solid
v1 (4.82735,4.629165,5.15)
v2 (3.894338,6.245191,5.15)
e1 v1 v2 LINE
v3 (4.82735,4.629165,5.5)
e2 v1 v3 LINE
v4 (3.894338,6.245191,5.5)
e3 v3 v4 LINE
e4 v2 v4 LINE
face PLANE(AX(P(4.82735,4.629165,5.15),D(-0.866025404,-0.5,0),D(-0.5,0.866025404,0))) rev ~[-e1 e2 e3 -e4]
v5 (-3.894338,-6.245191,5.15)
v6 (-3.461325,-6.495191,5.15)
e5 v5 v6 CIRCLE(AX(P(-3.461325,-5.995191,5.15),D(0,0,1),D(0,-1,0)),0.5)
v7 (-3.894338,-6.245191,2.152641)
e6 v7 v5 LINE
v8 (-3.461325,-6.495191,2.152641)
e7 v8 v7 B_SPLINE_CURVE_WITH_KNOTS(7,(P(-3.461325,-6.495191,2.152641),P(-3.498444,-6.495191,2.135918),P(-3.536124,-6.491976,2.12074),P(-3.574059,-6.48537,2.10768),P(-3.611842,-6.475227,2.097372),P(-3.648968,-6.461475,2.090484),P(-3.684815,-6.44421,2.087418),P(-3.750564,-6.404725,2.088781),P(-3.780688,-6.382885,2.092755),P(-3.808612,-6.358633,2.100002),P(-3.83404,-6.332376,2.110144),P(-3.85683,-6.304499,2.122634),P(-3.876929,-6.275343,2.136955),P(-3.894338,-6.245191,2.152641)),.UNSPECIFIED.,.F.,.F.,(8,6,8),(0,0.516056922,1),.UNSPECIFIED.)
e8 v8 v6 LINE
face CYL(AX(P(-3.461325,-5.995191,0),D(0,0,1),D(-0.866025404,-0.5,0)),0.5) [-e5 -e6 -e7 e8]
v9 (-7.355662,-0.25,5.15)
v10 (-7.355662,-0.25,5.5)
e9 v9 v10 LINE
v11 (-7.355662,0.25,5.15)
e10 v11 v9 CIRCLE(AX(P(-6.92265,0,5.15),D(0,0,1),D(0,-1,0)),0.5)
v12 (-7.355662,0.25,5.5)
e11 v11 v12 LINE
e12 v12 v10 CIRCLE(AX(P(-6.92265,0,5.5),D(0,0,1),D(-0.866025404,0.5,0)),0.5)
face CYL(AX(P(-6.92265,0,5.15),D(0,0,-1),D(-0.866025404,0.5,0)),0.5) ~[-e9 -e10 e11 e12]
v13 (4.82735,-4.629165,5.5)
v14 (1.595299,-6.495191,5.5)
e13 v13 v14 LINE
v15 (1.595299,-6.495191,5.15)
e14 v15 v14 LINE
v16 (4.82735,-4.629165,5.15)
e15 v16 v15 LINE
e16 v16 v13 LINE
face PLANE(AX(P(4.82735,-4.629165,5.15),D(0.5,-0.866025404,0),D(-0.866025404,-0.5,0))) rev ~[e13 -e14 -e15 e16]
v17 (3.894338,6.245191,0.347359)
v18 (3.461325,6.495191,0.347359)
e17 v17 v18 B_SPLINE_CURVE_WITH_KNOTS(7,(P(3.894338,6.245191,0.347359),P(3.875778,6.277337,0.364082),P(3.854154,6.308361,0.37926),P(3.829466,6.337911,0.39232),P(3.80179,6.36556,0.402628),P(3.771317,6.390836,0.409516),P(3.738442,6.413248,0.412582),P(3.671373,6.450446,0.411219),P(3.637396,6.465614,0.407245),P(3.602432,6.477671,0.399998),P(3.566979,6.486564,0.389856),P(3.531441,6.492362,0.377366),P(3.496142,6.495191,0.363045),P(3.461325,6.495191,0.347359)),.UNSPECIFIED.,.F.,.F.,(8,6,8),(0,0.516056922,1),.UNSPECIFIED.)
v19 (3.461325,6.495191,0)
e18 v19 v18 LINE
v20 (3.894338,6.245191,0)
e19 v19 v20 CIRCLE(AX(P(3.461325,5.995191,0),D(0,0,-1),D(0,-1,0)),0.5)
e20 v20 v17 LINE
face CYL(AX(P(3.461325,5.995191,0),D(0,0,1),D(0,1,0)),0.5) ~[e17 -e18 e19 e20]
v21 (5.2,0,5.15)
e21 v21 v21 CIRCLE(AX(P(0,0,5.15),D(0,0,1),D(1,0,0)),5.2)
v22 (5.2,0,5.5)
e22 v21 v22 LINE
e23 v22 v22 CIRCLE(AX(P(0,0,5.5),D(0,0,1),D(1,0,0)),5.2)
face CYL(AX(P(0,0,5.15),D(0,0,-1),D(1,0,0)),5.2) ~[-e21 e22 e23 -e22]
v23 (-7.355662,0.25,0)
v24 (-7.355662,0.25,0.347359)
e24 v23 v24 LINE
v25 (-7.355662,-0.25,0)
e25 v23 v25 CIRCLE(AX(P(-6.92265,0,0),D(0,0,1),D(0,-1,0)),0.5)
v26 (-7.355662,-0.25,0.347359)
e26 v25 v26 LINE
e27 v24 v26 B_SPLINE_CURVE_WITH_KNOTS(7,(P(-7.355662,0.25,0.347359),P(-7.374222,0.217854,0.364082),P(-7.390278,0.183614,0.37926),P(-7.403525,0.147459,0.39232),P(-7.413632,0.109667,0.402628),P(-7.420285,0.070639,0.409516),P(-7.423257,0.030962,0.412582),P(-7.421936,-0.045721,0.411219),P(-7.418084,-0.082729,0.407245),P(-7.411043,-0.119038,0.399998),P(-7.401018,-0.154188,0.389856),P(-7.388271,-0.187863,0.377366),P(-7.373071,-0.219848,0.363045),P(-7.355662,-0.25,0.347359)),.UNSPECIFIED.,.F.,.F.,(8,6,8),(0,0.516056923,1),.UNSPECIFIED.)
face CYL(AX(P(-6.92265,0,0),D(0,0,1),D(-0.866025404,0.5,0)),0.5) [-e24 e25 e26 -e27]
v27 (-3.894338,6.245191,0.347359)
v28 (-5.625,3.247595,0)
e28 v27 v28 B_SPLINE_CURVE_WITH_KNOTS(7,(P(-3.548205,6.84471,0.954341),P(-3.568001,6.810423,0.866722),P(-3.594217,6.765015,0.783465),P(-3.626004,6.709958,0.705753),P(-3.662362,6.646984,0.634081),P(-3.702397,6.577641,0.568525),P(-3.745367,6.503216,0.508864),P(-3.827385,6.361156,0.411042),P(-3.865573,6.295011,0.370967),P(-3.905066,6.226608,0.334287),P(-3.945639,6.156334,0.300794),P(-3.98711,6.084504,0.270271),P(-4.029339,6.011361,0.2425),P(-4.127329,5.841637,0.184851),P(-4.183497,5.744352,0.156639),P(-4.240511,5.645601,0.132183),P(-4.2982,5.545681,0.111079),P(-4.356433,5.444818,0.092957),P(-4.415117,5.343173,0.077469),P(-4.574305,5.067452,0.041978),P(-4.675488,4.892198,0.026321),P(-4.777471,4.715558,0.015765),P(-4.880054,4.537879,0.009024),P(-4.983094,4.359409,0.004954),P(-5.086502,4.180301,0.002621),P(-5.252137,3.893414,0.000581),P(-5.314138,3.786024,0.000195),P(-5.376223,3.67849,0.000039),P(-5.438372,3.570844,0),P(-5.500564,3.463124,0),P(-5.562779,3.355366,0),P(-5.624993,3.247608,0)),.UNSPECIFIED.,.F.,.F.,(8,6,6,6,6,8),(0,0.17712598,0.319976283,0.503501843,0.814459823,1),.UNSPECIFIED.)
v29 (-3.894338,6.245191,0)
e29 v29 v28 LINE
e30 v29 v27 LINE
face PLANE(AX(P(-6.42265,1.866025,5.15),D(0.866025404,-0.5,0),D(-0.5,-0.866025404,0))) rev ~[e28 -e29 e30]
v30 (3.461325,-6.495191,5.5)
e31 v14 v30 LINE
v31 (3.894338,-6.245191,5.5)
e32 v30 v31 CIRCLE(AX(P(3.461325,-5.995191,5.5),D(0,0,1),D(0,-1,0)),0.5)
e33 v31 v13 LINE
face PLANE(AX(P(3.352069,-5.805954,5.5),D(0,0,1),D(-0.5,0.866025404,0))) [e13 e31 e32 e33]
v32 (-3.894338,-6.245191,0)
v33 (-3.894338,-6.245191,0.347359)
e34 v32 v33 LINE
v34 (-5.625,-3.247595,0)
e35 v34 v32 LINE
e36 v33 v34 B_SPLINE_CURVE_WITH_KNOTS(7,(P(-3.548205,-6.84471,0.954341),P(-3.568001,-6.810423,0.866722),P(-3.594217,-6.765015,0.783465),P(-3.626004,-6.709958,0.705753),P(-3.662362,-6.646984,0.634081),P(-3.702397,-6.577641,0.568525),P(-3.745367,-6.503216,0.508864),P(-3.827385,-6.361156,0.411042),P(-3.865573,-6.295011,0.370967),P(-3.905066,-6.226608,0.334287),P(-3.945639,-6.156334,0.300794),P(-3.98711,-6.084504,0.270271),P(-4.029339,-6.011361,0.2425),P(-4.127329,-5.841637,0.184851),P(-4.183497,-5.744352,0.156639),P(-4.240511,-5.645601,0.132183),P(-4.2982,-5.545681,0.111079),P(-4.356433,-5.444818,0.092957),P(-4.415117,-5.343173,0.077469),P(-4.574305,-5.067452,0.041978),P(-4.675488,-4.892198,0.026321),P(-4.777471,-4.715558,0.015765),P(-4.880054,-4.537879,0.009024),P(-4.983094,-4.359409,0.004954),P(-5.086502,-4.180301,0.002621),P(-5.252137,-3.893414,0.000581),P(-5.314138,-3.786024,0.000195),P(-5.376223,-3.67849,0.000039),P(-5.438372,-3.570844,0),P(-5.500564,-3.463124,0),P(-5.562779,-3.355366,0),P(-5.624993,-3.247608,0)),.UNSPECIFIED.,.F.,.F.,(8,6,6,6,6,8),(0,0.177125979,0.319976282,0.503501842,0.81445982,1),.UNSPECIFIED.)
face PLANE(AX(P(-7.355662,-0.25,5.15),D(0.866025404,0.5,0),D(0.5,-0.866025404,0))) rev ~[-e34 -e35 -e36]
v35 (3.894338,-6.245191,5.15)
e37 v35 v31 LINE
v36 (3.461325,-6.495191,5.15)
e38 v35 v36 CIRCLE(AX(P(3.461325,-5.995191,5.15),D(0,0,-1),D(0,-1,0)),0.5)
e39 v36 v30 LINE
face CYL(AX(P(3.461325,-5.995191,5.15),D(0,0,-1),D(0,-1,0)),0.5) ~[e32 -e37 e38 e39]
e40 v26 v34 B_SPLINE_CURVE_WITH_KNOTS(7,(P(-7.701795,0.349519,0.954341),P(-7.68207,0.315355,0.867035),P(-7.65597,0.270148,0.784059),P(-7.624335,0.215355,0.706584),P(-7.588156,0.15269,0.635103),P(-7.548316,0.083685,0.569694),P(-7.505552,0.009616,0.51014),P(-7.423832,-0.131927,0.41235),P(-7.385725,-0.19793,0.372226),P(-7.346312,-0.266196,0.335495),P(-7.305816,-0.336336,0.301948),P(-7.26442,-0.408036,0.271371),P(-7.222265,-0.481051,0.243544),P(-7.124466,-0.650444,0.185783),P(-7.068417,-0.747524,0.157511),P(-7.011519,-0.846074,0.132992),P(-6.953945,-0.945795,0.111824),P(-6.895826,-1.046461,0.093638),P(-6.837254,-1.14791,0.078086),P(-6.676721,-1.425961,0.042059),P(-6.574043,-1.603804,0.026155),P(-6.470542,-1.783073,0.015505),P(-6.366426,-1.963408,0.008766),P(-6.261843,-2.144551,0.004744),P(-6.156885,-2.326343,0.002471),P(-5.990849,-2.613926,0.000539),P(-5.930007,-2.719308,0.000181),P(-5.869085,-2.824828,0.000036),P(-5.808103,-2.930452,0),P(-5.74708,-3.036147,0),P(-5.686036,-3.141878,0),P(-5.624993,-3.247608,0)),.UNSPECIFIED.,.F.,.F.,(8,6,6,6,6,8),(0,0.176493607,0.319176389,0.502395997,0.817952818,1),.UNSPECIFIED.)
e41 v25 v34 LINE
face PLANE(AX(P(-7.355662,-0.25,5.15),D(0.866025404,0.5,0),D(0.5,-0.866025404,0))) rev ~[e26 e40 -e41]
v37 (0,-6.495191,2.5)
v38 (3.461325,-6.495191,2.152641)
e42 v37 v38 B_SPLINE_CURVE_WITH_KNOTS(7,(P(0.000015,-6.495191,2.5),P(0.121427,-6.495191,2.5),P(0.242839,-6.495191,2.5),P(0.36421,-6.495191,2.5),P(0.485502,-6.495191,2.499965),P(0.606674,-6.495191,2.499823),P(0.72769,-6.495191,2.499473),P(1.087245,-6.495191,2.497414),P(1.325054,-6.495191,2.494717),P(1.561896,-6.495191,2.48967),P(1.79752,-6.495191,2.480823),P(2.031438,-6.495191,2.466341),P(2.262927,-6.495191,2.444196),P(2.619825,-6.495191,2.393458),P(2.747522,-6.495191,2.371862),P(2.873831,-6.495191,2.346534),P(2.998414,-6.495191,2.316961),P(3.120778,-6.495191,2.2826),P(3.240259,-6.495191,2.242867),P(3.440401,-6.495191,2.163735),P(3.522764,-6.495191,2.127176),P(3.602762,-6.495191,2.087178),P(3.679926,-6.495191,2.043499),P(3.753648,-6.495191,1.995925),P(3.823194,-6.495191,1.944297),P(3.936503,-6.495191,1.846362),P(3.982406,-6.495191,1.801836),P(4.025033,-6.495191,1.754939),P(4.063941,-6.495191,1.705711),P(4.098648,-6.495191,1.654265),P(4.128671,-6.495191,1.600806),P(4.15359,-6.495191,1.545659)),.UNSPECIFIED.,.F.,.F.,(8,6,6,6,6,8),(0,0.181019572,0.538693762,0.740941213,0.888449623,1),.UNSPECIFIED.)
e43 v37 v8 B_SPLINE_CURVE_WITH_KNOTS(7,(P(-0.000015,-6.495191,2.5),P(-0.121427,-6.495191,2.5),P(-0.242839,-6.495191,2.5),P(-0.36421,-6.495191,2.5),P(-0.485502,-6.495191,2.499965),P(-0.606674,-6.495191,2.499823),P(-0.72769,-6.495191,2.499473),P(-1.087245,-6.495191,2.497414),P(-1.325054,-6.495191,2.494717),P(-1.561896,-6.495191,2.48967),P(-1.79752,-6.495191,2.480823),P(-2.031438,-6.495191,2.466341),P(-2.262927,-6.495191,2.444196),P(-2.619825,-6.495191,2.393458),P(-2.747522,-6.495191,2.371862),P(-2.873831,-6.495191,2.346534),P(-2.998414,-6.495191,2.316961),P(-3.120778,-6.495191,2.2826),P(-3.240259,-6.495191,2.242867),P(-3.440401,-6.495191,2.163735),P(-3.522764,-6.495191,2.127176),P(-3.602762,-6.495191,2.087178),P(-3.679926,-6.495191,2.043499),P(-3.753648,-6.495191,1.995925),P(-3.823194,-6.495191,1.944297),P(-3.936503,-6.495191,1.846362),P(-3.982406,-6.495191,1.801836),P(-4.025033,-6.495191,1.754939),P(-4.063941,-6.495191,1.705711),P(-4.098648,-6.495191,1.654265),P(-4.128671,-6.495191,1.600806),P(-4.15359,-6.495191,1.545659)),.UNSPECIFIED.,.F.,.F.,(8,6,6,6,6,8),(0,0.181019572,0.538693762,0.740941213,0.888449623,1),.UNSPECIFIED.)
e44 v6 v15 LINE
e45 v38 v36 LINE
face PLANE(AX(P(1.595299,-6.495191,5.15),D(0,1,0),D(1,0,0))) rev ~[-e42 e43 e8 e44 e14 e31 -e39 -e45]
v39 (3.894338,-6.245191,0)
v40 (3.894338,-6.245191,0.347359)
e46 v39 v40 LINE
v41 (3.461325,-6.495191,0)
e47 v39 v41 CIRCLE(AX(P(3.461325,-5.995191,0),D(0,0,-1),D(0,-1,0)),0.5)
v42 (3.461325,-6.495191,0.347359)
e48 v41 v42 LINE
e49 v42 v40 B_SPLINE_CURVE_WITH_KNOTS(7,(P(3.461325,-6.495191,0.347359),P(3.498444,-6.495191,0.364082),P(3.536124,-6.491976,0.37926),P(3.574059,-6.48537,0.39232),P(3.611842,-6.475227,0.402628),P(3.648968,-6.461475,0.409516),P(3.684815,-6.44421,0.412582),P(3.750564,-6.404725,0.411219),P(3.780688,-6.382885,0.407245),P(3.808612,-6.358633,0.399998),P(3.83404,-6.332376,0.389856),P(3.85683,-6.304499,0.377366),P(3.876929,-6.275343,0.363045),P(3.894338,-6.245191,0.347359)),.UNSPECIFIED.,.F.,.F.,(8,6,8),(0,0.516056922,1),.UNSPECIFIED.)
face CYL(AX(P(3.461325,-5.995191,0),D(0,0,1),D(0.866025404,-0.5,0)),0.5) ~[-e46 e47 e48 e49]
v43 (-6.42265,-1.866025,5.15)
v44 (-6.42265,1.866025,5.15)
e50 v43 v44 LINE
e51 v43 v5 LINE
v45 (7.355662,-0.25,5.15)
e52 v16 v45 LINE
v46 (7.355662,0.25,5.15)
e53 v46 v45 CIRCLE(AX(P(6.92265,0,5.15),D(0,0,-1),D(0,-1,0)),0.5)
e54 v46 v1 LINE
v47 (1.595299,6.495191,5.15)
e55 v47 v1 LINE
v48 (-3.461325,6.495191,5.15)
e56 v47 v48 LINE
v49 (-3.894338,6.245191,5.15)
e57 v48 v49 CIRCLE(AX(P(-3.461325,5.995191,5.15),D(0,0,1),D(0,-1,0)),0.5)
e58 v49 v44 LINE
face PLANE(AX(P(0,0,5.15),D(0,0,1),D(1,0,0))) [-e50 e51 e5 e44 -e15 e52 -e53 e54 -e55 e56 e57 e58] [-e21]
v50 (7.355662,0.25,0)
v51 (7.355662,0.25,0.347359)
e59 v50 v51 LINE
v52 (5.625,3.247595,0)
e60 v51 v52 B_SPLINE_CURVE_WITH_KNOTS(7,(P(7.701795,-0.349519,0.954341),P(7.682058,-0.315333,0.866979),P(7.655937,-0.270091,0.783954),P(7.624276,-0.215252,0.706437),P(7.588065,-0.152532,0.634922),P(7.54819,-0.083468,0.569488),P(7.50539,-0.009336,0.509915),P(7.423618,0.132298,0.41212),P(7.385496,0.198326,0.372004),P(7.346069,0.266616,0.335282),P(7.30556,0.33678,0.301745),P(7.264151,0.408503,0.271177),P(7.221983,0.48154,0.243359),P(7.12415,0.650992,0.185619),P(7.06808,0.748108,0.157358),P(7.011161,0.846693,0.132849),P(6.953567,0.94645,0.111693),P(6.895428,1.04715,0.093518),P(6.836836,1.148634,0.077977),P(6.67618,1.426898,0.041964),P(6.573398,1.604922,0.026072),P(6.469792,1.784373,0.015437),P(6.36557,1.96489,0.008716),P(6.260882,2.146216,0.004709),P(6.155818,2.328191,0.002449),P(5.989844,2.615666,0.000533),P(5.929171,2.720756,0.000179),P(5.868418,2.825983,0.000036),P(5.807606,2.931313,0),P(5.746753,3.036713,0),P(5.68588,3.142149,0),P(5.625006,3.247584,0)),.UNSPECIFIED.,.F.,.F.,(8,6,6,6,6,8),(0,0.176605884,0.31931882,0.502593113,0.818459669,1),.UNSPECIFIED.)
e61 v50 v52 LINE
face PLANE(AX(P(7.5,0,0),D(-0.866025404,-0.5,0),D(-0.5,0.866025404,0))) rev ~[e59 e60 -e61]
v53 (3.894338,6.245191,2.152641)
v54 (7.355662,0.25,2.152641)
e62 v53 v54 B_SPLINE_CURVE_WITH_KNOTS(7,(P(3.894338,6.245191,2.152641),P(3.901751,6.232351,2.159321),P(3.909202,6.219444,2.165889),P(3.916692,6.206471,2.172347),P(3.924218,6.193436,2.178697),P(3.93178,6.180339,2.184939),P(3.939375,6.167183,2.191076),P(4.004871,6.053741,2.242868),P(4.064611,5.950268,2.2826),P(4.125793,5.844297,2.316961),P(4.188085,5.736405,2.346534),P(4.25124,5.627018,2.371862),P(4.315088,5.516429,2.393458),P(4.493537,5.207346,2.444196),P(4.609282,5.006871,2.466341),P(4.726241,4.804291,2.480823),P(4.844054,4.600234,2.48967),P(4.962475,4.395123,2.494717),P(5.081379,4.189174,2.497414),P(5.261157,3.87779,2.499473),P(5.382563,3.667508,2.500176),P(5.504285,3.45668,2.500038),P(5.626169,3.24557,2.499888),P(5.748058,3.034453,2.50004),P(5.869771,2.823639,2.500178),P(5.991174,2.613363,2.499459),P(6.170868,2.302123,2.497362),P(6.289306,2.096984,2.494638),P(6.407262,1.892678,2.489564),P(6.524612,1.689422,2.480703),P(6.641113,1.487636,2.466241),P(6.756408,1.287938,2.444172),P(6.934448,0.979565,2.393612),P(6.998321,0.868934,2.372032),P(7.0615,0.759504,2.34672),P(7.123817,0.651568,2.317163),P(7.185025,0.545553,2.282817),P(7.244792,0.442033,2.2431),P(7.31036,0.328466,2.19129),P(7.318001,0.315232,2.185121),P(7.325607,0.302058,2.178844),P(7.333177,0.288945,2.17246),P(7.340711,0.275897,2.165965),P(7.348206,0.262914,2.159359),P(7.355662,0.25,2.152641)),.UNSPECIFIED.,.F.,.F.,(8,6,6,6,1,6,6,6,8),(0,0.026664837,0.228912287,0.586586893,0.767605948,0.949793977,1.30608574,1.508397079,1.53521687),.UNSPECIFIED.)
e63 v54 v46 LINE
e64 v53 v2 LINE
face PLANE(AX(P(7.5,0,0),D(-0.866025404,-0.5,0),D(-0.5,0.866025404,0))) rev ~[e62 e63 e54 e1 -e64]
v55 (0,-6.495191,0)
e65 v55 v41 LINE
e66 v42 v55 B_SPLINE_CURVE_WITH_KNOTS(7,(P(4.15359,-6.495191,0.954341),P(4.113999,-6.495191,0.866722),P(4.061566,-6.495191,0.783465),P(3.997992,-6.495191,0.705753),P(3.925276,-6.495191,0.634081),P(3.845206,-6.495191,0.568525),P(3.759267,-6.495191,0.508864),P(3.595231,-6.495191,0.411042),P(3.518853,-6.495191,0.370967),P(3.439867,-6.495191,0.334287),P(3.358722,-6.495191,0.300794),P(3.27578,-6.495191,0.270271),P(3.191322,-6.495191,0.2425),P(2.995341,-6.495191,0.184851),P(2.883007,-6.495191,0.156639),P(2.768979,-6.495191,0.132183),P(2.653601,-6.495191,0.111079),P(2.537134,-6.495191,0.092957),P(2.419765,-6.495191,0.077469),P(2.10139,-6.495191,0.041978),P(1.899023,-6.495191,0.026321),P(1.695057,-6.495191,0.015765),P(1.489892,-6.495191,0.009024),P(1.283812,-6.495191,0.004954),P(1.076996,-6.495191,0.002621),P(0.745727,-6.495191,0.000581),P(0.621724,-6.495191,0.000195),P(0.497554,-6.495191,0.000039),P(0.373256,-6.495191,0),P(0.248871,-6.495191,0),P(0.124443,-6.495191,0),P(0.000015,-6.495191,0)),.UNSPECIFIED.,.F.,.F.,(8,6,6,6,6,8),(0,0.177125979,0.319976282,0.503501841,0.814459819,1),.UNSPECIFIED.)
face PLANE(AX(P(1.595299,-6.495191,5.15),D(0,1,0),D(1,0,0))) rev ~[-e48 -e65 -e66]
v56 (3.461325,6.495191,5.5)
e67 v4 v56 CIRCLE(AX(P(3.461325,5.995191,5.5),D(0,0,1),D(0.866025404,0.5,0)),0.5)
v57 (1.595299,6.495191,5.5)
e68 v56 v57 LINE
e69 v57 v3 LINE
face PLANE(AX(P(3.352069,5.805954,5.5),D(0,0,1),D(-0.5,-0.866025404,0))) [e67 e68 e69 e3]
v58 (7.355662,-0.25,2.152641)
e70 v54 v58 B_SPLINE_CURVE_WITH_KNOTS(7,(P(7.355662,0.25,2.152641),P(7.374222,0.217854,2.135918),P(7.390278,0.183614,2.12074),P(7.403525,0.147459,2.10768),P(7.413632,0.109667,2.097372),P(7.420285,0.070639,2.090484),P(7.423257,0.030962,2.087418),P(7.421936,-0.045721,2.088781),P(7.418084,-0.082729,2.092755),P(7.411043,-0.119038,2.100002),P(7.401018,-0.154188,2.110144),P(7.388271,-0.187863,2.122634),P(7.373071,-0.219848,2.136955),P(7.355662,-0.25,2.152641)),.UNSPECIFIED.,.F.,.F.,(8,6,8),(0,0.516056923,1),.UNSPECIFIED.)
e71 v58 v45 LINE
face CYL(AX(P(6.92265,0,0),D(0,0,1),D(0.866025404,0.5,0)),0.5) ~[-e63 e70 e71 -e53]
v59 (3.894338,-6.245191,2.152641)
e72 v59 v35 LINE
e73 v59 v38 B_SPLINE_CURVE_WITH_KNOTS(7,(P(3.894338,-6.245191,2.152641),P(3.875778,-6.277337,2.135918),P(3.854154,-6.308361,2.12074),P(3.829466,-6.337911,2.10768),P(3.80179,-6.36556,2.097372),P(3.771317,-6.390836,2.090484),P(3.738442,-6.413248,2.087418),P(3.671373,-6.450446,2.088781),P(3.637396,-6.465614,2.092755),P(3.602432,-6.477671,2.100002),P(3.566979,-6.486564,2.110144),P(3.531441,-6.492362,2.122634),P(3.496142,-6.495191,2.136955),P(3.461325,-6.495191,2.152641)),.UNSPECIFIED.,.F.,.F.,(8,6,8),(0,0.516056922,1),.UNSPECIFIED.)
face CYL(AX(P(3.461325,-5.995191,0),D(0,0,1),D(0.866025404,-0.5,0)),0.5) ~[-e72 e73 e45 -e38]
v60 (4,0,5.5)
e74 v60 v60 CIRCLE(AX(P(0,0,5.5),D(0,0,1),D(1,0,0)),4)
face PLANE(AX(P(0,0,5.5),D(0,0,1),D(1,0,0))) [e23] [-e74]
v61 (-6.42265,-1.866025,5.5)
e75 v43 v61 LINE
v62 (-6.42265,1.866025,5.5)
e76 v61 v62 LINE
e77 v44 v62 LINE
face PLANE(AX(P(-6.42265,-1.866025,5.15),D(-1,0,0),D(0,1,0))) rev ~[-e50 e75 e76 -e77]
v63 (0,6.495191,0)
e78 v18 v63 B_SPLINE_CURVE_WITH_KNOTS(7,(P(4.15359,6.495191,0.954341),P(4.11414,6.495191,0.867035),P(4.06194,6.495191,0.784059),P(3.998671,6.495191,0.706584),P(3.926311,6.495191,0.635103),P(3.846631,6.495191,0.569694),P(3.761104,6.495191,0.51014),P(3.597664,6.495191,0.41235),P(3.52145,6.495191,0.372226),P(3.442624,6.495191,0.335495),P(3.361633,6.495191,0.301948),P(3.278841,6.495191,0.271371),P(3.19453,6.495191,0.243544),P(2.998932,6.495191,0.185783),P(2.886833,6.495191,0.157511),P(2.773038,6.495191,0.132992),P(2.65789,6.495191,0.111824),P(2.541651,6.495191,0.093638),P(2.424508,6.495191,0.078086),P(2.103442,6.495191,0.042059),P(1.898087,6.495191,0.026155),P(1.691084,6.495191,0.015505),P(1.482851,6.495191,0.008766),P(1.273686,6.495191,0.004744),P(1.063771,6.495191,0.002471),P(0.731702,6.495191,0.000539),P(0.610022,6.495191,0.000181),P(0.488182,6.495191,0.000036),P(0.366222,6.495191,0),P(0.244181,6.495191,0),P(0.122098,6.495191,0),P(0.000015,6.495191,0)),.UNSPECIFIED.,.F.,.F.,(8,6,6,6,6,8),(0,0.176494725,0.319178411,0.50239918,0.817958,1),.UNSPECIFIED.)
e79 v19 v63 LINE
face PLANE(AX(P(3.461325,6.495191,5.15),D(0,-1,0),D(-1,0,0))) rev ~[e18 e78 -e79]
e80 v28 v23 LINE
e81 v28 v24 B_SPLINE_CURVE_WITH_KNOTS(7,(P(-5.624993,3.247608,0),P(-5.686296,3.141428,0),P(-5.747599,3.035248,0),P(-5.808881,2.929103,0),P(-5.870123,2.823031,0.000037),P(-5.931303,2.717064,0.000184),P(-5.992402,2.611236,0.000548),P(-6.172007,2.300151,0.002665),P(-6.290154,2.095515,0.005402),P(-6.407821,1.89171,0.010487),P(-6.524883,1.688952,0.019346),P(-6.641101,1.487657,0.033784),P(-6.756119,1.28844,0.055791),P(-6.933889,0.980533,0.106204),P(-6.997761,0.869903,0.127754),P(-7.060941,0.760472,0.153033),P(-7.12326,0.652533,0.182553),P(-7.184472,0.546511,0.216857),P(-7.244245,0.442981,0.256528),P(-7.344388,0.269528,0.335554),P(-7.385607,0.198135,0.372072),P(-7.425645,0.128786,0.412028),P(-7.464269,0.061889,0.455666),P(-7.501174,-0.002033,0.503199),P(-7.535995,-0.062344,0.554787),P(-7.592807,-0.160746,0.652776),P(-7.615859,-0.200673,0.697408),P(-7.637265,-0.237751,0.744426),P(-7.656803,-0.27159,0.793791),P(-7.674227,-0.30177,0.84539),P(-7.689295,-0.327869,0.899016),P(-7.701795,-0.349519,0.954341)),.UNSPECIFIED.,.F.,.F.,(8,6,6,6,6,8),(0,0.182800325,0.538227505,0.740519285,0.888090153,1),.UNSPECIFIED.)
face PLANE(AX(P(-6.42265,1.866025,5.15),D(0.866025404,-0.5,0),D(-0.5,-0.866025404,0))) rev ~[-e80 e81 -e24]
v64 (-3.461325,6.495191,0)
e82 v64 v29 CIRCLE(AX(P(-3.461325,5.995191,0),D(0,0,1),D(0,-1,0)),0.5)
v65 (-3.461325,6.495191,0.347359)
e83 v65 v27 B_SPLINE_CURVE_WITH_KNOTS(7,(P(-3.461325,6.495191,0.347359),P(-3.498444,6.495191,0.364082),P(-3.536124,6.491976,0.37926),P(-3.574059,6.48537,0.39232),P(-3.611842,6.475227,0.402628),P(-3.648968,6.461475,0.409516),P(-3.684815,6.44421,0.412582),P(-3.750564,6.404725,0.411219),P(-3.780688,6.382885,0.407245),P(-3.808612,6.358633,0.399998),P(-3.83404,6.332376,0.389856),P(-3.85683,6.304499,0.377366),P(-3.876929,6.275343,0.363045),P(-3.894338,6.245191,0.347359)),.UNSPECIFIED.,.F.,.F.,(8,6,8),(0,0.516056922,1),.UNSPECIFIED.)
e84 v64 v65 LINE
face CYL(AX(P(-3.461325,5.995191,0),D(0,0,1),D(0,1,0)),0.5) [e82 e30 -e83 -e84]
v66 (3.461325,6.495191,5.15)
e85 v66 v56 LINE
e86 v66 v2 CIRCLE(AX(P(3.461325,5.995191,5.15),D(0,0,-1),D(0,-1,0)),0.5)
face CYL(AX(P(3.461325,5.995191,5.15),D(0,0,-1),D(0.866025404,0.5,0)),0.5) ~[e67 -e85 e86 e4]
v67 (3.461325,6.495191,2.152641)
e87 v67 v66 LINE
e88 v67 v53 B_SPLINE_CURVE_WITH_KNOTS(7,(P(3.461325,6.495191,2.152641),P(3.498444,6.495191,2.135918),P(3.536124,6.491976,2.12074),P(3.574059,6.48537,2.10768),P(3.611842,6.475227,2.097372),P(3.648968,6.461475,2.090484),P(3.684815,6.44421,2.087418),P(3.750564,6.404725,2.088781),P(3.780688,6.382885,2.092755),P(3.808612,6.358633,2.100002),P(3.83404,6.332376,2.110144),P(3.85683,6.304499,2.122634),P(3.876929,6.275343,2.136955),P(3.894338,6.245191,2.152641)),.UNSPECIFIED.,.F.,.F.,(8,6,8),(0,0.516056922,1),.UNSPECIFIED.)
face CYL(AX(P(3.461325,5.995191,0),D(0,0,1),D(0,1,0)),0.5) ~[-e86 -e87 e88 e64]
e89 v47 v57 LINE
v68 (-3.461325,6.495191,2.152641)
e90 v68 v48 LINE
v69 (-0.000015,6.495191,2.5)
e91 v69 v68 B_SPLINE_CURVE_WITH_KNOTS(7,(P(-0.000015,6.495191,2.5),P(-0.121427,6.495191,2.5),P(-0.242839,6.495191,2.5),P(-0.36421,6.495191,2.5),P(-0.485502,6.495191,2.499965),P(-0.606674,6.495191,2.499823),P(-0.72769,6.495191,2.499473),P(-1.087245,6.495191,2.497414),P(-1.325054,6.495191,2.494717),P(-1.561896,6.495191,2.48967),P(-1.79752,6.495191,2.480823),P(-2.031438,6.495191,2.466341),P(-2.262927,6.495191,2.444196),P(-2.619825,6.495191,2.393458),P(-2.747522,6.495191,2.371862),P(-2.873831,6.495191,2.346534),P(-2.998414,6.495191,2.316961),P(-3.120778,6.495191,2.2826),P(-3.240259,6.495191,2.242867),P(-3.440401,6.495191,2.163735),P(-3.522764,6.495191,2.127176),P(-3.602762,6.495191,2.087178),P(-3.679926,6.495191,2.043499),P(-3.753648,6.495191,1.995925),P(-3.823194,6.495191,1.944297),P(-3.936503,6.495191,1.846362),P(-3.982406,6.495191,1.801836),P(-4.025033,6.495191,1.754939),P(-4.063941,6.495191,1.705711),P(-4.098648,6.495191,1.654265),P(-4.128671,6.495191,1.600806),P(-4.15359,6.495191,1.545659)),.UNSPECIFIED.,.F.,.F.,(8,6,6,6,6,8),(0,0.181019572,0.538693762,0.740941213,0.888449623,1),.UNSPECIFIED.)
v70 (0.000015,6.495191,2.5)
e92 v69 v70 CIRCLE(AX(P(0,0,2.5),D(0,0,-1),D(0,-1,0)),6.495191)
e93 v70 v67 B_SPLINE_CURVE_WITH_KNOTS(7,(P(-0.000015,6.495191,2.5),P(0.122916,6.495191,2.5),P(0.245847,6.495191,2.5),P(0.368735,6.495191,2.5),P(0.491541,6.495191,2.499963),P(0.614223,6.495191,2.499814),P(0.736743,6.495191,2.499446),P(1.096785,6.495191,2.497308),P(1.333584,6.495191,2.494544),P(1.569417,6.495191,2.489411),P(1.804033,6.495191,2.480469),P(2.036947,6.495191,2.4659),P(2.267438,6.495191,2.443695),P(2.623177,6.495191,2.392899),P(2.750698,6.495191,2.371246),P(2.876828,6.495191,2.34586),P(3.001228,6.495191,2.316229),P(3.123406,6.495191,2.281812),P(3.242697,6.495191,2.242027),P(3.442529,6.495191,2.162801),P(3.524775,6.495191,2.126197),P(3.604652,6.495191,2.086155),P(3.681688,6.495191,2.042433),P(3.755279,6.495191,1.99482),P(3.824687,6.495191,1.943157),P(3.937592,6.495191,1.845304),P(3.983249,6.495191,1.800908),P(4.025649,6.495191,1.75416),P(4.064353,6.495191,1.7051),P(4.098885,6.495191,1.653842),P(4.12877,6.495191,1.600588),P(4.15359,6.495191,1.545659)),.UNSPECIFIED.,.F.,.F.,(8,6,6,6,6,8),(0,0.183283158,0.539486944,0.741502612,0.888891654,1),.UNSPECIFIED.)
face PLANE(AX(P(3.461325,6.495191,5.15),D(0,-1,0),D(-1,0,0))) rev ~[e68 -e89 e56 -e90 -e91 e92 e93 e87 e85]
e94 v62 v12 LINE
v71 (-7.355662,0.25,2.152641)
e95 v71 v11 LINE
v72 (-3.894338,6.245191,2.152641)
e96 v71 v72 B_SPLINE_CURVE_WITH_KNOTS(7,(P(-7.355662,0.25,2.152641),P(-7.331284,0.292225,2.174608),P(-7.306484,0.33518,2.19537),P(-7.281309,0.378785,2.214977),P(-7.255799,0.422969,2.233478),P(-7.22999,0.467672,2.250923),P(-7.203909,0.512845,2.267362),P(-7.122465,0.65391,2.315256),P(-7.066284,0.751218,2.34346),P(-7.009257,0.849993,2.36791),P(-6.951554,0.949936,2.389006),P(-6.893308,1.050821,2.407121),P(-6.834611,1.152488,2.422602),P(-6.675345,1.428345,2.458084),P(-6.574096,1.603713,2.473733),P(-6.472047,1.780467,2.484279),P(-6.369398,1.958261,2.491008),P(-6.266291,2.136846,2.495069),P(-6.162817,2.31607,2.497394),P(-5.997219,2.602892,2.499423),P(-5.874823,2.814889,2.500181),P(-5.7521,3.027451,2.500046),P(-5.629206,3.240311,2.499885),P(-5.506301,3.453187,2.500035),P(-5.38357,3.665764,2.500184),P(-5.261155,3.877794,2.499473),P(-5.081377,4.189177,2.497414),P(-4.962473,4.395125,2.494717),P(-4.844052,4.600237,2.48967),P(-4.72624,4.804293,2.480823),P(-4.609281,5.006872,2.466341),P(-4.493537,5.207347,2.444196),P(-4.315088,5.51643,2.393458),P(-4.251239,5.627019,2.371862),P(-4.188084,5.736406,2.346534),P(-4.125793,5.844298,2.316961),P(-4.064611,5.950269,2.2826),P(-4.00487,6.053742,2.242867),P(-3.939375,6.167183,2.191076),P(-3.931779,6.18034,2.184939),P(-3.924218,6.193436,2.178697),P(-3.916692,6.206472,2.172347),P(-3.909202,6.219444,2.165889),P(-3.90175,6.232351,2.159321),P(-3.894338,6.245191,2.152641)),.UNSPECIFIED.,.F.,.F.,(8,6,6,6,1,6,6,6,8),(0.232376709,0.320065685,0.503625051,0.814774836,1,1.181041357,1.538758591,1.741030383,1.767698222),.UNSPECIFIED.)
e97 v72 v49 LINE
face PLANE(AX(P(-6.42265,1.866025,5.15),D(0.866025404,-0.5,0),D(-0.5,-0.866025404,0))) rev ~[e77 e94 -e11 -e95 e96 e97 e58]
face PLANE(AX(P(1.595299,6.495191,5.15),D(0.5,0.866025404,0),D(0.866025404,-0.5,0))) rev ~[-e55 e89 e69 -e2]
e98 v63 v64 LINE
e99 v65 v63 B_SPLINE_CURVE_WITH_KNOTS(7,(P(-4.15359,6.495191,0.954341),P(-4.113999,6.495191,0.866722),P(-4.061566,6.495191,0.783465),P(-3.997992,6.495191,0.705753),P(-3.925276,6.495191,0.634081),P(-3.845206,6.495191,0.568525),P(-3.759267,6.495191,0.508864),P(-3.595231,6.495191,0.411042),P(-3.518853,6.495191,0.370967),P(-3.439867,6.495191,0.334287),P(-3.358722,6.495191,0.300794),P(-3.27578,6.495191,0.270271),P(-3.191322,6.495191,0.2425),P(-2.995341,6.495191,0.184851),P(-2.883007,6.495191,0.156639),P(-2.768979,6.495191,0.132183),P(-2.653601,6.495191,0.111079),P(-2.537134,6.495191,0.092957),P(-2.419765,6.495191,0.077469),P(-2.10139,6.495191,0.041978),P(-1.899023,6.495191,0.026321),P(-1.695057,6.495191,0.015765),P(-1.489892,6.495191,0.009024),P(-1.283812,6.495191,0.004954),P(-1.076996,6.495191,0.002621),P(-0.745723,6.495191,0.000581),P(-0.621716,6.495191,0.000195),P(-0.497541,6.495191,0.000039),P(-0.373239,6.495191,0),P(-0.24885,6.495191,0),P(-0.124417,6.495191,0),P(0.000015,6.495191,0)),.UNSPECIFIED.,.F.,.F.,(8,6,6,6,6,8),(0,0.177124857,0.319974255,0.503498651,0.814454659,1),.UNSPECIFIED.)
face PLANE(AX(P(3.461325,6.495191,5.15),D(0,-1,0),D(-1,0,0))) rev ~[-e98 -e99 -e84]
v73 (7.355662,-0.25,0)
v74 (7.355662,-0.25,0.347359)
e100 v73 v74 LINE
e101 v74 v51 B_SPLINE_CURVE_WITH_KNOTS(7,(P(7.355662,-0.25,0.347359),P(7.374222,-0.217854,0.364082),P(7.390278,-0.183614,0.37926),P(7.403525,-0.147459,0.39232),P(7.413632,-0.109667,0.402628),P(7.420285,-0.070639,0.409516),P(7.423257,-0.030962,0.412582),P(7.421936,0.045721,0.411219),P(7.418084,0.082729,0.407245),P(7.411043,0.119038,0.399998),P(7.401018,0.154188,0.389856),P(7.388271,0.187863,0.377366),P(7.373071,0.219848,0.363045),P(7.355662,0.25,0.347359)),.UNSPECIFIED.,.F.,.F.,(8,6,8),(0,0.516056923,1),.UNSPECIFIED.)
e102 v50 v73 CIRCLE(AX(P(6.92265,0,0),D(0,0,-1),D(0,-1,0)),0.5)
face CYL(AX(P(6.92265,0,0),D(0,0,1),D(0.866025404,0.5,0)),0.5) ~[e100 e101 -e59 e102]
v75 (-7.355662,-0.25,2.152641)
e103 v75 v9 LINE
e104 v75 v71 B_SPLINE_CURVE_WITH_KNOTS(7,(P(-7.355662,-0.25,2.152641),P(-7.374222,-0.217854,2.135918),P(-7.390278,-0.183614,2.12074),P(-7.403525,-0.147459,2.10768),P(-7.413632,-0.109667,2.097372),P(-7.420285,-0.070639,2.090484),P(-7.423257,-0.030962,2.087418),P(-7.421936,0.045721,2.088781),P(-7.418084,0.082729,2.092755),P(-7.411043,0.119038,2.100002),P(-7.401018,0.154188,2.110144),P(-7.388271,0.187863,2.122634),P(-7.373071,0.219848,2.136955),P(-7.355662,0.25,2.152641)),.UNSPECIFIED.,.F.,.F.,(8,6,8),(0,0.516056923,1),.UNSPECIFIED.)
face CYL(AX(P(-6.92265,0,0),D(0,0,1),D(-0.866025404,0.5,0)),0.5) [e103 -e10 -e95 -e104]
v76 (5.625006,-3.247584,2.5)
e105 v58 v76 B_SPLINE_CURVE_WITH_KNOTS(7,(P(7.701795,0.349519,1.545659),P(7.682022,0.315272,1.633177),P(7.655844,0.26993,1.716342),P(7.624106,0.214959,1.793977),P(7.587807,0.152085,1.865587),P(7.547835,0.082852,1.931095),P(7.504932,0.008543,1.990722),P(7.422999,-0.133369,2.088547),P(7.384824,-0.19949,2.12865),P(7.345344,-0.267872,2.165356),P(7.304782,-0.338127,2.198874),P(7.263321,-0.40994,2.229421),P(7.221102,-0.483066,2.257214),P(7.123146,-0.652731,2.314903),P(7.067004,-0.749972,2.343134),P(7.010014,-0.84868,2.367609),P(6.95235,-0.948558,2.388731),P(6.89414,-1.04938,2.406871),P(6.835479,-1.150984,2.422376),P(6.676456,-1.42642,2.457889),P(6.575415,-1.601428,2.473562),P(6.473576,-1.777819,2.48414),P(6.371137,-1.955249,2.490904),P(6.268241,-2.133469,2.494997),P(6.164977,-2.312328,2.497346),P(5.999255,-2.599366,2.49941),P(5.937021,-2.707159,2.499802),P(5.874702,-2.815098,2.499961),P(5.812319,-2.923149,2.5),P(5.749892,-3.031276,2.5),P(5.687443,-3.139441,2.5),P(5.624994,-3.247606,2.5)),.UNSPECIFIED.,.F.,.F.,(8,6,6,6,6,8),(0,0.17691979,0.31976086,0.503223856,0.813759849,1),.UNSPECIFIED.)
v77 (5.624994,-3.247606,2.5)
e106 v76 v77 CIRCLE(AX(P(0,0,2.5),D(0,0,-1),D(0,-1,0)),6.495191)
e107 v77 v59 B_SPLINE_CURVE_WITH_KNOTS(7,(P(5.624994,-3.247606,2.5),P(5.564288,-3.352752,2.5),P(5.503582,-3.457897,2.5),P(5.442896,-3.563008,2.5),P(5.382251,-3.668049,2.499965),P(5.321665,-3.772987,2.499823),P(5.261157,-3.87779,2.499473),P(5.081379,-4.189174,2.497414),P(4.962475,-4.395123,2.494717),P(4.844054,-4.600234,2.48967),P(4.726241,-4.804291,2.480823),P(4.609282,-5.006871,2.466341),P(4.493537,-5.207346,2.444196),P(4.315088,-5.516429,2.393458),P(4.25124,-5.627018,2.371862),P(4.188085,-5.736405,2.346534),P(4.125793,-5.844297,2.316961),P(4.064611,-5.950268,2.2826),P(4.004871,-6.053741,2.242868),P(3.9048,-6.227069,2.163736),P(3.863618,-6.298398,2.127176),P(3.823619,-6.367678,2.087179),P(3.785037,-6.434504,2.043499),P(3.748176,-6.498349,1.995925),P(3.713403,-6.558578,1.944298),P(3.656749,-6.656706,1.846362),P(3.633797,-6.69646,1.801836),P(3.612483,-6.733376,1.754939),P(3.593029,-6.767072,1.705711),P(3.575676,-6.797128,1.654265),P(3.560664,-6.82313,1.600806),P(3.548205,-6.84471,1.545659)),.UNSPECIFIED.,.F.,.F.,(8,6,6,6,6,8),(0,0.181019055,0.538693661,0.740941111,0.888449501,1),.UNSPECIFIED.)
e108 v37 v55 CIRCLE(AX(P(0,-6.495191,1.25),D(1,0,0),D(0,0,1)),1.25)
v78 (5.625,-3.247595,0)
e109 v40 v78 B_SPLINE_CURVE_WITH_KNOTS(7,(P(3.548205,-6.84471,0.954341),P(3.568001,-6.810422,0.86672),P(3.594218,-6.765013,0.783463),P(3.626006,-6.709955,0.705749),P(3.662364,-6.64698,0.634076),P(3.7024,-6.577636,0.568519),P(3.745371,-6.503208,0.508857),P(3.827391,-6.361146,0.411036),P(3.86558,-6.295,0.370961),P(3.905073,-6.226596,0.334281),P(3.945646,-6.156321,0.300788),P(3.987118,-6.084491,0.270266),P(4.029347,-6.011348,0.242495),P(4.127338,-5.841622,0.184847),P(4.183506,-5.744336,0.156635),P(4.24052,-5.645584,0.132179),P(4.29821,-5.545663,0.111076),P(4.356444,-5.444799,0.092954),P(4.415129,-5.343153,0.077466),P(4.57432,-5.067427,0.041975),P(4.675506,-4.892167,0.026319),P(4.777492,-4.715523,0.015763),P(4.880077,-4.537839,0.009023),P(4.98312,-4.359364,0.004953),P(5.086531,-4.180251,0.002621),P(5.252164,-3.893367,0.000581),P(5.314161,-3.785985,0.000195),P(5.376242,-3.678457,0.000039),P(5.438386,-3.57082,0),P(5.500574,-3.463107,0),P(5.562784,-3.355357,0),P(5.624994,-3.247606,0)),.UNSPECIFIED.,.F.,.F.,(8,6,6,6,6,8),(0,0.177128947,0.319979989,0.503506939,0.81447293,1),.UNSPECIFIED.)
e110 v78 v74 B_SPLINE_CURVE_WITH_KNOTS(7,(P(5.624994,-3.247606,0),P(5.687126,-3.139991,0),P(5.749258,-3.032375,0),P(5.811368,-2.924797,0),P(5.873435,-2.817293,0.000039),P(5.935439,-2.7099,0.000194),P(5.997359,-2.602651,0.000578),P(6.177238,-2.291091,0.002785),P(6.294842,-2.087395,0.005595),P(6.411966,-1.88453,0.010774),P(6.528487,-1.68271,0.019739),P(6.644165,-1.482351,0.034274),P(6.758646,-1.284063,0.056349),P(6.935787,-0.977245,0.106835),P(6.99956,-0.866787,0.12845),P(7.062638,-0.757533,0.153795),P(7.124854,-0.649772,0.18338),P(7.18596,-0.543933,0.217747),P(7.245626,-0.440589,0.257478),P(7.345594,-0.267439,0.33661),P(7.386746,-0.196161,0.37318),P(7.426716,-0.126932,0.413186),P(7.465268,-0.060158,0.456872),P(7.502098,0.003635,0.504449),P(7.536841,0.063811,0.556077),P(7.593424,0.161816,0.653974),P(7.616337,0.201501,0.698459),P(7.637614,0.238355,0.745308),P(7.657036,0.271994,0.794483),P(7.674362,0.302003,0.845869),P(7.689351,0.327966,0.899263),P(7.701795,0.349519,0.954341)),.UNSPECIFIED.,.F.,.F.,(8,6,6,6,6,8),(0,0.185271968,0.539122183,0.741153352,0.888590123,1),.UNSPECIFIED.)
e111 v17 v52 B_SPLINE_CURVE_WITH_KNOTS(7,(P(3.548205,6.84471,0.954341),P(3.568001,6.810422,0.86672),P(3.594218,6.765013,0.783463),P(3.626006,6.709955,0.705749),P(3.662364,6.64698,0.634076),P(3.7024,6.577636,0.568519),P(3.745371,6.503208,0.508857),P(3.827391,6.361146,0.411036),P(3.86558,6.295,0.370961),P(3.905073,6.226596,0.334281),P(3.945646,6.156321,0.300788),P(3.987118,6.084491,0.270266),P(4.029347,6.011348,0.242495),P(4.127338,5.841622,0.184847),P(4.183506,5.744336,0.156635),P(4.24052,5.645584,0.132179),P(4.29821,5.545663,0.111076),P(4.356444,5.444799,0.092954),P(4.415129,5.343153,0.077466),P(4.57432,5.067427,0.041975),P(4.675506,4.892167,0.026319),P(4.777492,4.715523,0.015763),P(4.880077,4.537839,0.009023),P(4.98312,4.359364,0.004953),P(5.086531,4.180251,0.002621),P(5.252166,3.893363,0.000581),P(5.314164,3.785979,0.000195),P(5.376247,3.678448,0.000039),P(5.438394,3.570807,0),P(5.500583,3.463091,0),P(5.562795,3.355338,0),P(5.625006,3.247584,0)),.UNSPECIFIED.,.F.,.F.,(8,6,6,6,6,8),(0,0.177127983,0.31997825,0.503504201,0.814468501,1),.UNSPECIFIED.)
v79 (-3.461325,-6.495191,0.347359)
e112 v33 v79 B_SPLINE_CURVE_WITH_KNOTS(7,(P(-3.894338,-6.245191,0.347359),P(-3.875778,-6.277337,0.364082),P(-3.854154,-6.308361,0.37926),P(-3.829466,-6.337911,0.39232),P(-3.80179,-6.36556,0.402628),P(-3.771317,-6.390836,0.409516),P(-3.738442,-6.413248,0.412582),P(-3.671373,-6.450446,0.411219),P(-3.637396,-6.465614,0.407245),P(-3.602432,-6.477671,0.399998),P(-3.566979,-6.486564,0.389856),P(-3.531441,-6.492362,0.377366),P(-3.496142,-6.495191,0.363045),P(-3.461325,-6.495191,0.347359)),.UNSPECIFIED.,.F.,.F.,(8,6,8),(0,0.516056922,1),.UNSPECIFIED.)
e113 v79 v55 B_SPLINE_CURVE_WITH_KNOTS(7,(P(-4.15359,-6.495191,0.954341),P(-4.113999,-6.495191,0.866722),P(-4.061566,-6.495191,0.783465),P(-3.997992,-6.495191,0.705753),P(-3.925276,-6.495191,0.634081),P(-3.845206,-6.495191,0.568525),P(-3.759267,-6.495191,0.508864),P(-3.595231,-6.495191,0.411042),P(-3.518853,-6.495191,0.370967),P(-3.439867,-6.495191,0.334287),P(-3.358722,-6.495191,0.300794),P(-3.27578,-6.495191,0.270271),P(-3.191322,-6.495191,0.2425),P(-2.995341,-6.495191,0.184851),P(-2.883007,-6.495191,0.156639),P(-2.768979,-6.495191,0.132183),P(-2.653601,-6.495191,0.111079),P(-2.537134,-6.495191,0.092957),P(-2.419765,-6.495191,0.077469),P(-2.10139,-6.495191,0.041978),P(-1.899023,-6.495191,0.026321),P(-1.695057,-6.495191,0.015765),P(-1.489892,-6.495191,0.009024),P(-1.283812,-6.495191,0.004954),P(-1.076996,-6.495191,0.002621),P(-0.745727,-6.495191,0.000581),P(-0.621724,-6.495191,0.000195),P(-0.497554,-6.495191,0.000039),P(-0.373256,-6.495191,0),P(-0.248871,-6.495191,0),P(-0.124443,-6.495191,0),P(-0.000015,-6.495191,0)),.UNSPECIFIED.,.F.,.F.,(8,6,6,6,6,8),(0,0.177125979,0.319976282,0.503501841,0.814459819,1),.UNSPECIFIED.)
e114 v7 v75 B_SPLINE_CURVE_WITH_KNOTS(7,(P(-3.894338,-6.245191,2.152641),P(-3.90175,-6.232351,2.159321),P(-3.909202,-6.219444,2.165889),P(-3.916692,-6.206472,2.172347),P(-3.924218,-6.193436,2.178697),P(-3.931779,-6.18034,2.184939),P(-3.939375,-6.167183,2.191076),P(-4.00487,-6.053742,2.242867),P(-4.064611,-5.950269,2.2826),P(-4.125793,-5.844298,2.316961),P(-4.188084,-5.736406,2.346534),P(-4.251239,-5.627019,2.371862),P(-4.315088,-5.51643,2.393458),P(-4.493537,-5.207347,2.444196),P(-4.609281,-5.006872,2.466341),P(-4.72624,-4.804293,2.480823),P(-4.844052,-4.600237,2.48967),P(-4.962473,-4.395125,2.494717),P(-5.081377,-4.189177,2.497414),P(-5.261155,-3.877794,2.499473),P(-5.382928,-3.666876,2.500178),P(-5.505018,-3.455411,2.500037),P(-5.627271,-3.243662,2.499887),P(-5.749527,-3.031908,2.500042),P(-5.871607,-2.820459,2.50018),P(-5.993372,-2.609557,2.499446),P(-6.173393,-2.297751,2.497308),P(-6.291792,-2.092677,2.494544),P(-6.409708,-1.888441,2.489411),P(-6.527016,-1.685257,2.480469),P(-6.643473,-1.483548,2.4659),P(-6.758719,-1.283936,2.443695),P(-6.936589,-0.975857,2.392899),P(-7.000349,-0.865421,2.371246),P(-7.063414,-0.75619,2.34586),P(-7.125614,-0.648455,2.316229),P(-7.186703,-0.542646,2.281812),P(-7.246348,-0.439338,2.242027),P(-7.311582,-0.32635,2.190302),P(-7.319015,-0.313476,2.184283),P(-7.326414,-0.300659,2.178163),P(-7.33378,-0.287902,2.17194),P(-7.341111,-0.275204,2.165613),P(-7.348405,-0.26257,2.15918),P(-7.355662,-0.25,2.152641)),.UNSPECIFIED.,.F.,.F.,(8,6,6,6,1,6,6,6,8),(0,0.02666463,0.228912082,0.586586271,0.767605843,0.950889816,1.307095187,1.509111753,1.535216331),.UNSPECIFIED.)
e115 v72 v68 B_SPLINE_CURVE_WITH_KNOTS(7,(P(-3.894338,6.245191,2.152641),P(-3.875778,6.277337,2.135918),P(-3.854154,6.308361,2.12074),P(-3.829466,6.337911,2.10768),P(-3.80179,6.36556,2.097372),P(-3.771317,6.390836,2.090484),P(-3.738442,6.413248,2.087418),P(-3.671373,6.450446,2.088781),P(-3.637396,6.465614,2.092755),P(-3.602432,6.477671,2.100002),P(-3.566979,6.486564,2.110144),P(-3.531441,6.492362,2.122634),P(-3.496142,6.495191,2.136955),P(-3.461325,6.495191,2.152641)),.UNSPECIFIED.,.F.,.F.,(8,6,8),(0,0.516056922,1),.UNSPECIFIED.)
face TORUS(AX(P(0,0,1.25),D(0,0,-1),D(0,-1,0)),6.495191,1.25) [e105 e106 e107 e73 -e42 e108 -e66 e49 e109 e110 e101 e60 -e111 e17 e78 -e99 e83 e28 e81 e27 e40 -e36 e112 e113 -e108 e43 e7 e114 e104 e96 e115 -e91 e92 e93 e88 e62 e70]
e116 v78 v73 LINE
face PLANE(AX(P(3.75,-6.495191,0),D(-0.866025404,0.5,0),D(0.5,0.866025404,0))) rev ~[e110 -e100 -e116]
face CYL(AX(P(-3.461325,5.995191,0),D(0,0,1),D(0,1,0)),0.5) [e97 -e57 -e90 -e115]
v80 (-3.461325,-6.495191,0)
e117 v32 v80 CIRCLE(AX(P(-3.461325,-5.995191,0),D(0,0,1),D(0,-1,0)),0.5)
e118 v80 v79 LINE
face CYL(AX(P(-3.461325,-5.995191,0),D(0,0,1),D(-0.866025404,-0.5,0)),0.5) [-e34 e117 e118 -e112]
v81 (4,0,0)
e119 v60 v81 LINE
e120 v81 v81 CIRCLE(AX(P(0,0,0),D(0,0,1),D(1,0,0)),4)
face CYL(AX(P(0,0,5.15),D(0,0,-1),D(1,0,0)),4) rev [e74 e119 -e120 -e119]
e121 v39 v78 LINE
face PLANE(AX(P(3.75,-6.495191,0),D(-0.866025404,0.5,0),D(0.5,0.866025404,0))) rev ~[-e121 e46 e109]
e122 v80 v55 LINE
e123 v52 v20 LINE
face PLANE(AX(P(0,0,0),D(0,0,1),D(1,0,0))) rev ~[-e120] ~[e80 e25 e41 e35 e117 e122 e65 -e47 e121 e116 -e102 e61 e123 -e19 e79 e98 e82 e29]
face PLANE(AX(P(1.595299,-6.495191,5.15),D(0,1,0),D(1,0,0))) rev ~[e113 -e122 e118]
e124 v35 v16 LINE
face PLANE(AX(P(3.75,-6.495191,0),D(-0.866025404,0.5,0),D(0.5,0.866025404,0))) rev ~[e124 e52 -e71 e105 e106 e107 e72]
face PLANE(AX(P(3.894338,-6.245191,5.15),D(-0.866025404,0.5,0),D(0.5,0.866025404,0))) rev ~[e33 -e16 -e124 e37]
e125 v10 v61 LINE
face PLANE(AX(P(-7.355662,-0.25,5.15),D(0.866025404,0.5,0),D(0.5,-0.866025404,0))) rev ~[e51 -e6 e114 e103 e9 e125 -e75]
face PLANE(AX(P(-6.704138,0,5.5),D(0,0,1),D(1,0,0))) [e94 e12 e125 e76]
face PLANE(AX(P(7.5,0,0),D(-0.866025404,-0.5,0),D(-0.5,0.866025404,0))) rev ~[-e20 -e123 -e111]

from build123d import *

# Parameters (mm, degrees)
F0_R            = 4
F1_DEPTH        = 5.15
F2_R            = 0.5
F4_DEPTH        = 0.35
F4_COPIES_COUNT = 3
F3_R            = 5.2
F3_R_2          = 4
F5_DEPTH        = 0.35


# Not quite as in the source:
# - a pattern or mirror of a feature is missing from the dataset's text; its kind, count and spacing are read off the source's solid


with BuildPart() as f1:
    # F0 (on Top) → F1 (new body)
    with BuildSketch(Plane.XY):
        Polygon((3.75, 6.4951905284), (-3.75, 6.4951905284), (-7.5, 0), (-3.75, -6.4951905284), (3.75, -6.4951905284), (7.5, 0), align=None)
        Circle(F0_R, mode=Mode.SUBTRACT)
    extrude(amount=F1_DEPTH)

    # F2
    f2_edges = [f1.edges().sort_by_distance(p)[0] for p in [
        (3.75, -6.495191, 2.575),
        (7.5, 0, 2.575),
        (3.75, 6.495191, 2.575),
        (-3.75, 6.495191, 2.575),
        (-7.5, 0, 2.575),
        (-3.75, -6.495191, 2.575),
    ]]
    fillet(f2_edges, radius=F2_R)

    # F3 (on face) → F4 (join)
    with BuildSketch(Plane.XY.offset(5.15)):
        with BuildLine():
            Line((-6.4226497308, 1.8660254038), (-7.3556624327, 0.25))
            ThreePointArc((-7.3556624327, 0.25), (-7.4226497308, 0), (-7.3556624327, -0.25))
            Line((-7.3556624327, -0.25), (-6.4226497308, -1.8660254038))
            Line((-6.4226497308, -1.8660254038), (-6.4226497308, 1.8660254038))
        make_face()
    f4 = extrude(amount=F4_DEPTH)

    # F4_copies: F4 ×3 about axis
    f4_copies_axis = Axis((0, 0, 0), (0, 0, 1))
    for i in range(1, F4_COPIES_COUNT):
        add(f4.rotate(f4_copies_axis, i * 360 / F4_COPIES_COUNT))

    # F3 (on face) → F5 (join, through all)
    with BuildSketch(Plane.XY.offset(5.15)):
        Circle(F3_R)
        Circle(F3_R_2, mode=Mode.SUBTRACT)
    extrude(amount=F5_DEPTH)

    # F6 (on Right) → F7 (revolve)
    with BuildSketch(Plane.YZ):
        with BuildLine():
            ThreePointArc((-6.4951905284, 2.5), (-7.7451905284, 1.25), (-6.4951905284, 0))
            Line((-6.4951905284, 0), (-6.4951905284, 2.5))
        make_face()
    revolve(axis=Axis((0, 0, -0.6419573572), (0, 0, -1)))


solid = f1.part
